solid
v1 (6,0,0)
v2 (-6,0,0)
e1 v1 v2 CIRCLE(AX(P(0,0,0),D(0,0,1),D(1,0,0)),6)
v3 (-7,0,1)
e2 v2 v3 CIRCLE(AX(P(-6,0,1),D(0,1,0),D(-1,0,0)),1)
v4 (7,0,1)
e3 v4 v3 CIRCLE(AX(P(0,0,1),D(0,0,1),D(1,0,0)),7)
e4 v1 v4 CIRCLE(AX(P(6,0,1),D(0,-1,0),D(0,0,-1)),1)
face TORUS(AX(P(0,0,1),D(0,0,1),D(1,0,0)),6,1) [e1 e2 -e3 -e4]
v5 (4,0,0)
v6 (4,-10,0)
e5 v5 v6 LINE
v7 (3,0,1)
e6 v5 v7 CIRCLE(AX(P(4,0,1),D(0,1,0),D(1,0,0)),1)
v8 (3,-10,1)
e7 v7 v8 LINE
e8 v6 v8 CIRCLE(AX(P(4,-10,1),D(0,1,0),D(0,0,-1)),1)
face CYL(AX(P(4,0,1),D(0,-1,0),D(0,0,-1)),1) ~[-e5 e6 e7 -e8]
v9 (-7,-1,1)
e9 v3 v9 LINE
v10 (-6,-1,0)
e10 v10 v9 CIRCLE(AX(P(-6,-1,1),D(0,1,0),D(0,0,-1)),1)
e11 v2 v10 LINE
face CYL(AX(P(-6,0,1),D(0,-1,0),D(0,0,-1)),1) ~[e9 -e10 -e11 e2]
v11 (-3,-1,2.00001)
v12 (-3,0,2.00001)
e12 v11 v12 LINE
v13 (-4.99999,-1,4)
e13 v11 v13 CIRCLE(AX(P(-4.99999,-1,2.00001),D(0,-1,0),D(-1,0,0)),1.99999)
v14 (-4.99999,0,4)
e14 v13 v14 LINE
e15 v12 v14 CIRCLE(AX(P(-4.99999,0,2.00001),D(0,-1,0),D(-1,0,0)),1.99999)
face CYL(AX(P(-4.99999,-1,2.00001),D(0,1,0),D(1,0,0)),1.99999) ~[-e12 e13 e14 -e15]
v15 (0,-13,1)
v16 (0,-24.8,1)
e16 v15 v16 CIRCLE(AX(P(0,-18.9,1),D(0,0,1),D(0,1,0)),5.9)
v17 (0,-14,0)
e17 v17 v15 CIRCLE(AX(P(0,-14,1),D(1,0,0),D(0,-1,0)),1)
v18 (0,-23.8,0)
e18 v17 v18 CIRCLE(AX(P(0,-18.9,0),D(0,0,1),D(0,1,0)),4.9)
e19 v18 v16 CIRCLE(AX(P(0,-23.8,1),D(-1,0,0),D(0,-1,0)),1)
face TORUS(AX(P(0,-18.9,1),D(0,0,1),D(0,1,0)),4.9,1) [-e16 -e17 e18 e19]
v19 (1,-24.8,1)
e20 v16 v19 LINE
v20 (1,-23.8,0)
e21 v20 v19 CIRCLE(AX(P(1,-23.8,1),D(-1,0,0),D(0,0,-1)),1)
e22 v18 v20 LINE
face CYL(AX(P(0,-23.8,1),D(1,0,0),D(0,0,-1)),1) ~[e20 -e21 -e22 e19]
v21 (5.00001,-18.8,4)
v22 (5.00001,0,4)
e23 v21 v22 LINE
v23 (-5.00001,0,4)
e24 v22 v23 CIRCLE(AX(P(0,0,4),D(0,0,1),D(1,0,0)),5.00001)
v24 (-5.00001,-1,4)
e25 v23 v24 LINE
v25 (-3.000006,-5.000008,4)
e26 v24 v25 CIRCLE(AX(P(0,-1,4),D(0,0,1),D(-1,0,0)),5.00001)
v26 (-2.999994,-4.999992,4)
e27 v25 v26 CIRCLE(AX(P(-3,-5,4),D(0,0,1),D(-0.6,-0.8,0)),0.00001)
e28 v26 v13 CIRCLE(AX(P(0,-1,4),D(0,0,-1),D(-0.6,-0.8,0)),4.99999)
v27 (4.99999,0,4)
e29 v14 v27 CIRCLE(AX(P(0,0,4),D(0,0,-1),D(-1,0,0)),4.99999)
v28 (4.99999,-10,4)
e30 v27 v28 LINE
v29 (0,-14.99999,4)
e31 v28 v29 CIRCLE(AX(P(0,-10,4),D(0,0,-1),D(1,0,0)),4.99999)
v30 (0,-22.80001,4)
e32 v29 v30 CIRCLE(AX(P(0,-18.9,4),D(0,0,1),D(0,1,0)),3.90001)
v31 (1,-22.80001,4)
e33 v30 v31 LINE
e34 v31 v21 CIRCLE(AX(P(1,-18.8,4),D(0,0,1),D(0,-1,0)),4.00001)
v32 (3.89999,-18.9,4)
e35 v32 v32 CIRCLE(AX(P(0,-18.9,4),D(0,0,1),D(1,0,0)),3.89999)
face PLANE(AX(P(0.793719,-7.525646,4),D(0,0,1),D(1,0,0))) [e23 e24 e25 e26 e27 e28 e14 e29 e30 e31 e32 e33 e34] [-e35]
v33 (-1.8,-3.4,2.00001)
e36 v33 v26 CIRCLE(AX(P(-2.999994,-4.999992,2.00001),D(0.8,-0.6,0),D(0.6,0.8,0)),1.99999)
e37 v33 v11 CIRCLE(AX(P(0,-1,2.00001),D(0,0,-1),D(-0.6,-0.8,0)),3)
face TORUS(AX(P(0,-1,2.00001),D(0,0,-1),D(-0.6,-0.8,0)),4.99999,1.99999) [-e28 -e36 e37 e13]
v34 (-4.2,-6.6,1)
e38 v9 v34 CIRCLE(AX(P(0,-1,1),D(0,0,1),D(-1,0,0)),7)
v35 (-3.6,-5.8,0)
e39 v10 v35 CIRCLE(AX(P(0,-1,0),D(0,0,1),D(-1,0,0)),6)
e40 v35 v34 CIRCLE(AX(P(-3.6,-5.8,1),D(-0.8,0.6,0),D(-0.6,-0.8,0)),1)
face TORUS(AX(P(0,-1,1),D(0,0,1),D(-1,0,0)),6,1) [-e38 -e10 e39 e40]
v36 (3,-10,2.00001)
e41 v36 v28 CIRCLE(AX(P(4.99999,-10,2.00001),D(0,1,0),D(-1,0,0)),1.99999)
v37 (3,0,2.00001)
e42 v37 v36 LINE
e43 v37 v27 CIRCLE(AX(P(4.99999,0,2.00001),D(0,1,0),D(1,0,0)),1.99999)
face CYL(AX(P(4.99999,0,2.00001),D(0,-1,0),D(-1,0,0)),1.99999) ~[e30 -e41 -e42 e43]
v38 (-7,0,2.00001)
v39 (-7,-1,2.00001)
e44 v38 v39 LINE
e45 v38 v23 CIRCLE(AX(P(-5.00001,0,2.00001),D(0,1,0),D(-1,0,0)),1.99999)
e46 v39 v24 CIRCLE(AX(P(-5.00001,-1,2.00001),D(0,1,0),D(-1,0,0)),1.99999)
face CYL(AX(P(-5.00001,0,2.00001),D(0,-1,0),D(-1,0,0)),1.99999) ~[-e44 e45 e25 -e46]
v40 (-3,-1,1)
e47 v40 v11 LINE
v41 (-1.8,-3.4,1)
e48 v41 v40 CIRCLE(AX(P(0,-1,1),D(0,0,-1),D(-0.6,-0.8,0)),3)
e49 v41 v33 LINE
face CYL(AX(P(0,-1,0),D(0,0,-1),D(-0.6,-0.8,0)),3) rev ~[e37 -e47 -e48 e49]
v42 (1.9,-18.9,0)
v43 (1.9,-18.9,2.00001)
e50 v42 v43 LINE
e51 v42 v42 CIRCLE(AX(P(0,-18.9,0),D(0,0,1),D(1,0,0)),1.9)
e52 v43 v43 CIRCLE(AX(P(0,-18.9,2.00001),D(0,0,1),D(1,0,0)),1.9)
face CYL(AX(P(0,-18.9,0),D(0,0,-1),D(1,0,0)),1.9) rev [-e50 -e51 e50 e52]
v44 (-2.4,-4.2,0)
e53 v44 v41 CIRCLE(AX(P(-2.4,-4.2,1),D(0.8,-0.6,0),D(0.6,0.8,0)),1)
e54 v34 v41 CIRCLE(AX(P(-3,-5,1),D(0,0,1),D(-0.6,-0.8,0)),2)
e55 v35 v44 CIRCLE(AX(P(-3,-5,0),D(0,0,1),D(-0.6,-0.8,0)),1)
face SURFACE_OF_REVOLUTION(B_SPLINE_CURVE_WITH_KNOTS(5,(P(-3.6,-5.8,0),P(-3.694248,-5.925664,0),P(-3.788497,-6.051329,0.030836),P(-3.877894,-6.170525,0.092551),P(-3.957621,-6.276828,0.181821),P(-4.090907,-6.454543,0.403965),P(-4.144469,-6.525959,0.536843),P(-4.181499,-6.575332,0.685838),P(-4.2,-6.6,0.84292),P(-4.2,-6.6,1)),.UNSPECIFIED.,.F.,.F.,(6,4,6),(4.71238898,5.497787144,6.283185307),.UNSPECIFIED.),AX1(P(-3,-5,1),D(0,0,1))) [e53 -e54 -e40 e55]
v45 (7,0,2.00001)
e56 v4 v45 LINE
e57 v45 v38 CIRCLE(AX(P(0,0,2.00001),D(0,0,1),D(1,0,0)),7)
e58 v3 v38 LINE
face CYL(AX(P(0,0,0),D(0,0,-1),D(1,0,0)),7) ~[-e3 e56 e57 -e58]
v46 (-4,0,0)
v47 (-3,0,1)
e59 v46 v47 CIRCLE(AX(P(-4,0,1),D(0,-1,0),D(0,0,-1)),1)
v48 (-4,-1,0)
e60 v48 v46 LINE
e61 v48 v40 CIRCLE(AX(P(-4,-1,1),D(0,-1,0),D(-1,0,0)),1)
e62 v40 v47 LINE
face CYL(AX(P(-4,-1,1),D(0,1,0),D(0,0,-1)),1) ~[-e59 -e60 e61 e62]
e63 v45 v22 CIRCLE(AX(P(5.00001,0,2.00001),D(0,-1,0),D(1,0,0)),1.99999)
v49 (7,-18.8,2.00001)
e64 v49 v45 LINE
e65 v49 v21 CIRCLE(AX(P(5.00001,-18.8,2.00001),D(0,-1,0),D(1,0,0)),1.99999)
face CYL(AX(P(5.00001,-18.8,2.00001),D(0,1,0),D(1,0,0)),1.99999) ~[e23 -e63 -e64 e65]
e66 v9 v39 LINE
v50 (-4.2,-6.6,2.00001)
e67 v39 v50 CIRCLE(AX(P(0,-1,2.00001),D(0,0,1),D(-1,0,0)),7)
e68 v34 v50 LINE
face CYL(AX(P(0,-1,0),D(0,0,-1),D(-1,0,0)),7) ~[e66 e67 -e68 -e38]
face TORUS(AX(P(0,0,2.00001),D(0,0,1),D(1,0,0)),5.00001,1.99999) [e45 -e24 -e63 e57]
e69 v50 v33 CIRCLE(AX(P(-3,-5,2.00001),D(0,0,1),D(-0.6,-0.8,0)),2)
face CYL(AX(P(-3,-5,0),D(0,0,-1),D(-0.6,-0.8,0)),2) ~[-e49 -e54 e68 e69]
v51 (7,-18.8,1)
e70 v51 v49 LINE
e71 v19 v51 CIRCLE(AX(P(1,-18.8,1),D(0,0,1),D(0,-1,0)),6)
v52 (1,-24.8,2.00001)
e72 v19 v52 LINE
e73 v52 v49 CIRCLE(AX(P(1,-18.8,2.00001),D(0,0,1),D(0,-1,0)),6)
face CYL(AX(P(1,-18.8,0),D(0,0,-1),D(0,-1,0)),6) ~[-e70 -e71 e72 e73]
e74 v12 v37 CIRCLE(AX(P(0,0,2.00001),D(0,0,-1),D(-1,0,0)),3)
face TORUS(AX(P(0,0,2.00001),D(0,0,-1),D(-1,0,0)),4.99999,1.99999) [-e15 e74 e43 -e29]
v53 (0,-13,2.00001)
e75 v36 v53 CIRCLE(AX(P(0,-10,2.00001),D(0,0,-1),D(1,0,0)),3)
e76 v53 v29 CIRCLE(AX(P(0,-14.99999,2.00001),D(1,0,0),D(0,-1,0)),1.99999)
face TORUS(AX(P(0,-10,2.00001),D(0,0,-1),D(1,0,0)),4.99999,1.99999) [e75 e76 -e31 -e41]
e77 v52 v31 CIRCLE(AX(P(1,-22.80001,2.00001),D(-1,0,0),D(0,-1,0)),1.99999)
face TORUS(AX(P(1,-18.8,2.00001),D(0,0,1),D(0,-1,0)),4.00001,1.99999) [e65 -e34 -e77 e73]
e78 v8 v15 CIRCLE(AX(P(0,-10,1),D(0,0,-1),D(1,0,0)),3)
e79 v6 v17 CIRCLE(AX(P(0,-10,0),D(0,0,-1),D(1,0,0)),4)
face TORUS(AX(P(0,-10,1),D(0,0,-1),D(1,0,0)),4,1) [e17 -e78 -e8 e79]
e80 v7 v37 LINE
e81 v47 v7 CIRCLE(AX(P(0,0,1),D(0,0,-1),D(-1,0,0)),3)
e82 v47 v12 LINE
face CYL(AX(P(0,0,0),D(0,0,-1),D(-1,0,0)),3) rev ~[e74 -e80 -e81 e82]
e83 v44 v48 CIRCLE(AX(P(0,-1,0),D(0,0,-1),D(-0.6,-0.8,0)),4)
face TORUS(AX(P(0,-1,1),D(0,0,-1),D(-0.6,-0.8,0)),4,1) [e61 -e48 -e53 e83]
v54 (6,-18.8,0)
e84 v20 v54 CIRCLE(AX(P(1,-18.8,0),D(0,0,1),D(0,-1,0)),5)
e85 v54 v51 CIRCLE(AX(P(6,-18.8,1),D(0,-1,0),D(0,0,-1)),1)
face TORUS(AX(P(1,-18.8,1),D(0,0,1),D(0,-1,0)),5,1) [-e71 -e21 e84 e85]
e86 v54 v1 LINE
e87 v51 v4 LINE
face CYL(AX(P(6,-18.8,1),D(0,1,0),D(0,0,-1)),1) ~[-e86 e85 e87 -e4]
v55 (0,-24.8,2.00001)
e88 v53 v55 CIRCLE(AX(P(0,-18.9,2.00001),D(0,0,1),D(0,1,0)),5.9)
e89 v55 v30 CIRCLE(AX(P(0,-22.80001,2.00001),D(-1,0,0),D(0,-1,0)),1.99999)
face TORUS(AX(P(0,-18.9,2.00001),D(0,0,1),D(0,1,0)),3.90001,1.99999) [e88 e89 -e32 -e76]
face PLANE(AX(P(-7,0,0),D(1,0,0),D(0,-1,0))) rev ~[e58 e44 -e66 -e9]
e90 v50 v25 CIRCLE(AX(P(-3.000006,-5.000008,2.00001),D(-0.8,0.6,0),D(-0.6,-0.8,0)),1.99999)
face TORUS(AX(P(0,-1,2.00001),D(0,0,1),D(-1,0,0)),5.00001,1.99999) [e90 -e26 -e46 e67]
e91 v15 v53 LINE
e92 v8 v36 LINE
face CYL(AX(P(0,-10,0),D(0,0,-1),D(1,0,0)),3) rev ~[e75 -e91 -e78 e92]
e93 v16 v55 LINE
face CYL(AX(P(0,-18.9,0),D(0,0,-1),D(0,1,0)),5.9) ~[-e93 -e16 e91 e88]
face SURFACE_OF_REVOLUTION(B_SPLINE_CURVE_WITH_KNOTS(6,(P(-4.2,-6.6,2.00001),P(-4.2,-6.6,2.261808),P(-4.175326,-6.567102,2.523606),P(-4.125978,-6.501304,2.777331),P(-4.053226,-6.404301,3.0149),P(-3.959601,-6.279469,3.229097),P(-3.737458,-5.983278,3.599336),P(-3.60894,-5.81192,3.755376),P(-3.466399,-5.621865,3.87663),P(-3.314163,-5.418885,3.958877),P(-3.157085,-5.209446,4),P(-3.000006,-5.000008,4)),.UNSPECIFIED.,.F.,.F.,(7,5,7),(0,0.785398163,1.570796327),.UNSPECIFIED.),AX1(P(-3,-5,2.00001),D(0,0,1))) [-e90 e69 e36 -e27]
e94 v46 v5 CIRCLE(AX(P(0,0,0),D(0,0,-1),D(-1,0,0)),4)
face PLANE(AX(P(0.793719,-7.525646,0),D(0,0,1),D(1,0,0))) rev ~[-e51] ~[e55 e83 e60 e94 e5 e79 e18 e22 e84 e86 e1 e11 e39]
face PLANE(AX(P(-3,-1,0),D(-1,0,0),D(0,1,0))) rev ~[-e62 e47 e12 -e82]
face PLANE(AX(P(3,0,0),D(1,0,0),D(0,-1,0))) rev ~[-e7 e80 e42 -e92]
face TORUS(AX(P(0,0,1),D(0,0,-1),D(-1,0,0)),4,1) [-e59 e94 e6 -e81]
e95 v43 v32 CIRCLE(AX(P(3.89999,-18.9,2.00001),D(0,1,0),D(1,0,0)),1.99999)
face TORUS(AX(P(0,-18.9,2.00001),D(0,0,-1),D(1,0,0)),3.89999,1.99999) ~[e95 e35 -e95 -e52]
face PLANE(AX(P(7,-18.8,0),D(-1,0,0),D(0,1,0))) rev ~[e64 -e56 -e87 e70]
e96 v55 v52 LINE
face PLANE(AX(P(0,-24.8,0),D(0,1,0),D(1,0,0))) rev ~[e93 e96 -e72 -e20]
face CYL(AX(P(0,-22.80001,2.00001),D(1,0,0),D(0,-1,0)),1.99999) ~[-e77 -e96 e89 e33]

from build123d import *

# Parameters (mm, degrees)
F0_R     = 1.9
F1_DEPTH = 4
F2_R     = 1.99999
F3_R     = 1


# Not quite as in the source:
# - a fillet or chamfer is up to 0.001 mm smaller than in the source, because OpenCascade refuses the exact size


with BuildPart() as f1:
    # F0 (on Top) → F1 (new body)
    with BuildSketch(Plane.XY):
        with BuildLine():
            ThreePointArc((-3, 0), (0, 3), (3, 0))
            Line((3, 0), (3, -10))
            ThreePointArc((3, -10), (2.1213203436, -12.1213203436), (0, -13))
            ThreePointArc((0, -13), (-5.9, -18.9), (0, -24.8))
            Line((0, -24.8), (1, -24.8))
            ThreePointArc((1, -24.8), (5.2426406871, -23.0426406871), (7, -18.8))
            Line((7, -18.8), (7, 0))
            ThreePointArc((7, 0), (0, 7), (-7, 0))
            Line((-7, 0), (-7, -1))
            ThreePointArc((-7, -1), (-6.260990337, -4.1304951685), (-4.2, -6.6))
            ThreePointArc((-4.2, -6.6), (-2.105572809, -6.788854382), (-1, -5))
            ThreePointArc((-1, -5), (-1.211145618, -4.105572809), (-1.8, -3.4))
            ThreePointArc((-1.8, -3.4), (-2.683281573, -2.3416407865), (-3, -1))
            Line((-3, -1), (-3, 0))
        make_face()
        with Locations((0, -18.9)):
            Circle(F0_R, mode=Mode.SUBTRACT)
    extrude(amount=F1_DEPTH)

    # F2 (radius 2 in the source; OpenCascade refuses exactly that, so slightly less here)
    f2_edges = [f1.edges().sort_by_distance(p)[0] for p in [
        (0, 3, 4),
        (-1.9, -18.9, 4),
    ]]
    fillet(f2_edges, radius=F2_R)

    # F3
    f3_edges = [f1.edges().sort_by_distance(p)[0] for p in [
        (7, -9.4, 0),
        (0, 7, 0),
        (-7, -0.5, 0),
    ]]
    fillet(f3_edges, radius=F3_R)


solid = f1.part
